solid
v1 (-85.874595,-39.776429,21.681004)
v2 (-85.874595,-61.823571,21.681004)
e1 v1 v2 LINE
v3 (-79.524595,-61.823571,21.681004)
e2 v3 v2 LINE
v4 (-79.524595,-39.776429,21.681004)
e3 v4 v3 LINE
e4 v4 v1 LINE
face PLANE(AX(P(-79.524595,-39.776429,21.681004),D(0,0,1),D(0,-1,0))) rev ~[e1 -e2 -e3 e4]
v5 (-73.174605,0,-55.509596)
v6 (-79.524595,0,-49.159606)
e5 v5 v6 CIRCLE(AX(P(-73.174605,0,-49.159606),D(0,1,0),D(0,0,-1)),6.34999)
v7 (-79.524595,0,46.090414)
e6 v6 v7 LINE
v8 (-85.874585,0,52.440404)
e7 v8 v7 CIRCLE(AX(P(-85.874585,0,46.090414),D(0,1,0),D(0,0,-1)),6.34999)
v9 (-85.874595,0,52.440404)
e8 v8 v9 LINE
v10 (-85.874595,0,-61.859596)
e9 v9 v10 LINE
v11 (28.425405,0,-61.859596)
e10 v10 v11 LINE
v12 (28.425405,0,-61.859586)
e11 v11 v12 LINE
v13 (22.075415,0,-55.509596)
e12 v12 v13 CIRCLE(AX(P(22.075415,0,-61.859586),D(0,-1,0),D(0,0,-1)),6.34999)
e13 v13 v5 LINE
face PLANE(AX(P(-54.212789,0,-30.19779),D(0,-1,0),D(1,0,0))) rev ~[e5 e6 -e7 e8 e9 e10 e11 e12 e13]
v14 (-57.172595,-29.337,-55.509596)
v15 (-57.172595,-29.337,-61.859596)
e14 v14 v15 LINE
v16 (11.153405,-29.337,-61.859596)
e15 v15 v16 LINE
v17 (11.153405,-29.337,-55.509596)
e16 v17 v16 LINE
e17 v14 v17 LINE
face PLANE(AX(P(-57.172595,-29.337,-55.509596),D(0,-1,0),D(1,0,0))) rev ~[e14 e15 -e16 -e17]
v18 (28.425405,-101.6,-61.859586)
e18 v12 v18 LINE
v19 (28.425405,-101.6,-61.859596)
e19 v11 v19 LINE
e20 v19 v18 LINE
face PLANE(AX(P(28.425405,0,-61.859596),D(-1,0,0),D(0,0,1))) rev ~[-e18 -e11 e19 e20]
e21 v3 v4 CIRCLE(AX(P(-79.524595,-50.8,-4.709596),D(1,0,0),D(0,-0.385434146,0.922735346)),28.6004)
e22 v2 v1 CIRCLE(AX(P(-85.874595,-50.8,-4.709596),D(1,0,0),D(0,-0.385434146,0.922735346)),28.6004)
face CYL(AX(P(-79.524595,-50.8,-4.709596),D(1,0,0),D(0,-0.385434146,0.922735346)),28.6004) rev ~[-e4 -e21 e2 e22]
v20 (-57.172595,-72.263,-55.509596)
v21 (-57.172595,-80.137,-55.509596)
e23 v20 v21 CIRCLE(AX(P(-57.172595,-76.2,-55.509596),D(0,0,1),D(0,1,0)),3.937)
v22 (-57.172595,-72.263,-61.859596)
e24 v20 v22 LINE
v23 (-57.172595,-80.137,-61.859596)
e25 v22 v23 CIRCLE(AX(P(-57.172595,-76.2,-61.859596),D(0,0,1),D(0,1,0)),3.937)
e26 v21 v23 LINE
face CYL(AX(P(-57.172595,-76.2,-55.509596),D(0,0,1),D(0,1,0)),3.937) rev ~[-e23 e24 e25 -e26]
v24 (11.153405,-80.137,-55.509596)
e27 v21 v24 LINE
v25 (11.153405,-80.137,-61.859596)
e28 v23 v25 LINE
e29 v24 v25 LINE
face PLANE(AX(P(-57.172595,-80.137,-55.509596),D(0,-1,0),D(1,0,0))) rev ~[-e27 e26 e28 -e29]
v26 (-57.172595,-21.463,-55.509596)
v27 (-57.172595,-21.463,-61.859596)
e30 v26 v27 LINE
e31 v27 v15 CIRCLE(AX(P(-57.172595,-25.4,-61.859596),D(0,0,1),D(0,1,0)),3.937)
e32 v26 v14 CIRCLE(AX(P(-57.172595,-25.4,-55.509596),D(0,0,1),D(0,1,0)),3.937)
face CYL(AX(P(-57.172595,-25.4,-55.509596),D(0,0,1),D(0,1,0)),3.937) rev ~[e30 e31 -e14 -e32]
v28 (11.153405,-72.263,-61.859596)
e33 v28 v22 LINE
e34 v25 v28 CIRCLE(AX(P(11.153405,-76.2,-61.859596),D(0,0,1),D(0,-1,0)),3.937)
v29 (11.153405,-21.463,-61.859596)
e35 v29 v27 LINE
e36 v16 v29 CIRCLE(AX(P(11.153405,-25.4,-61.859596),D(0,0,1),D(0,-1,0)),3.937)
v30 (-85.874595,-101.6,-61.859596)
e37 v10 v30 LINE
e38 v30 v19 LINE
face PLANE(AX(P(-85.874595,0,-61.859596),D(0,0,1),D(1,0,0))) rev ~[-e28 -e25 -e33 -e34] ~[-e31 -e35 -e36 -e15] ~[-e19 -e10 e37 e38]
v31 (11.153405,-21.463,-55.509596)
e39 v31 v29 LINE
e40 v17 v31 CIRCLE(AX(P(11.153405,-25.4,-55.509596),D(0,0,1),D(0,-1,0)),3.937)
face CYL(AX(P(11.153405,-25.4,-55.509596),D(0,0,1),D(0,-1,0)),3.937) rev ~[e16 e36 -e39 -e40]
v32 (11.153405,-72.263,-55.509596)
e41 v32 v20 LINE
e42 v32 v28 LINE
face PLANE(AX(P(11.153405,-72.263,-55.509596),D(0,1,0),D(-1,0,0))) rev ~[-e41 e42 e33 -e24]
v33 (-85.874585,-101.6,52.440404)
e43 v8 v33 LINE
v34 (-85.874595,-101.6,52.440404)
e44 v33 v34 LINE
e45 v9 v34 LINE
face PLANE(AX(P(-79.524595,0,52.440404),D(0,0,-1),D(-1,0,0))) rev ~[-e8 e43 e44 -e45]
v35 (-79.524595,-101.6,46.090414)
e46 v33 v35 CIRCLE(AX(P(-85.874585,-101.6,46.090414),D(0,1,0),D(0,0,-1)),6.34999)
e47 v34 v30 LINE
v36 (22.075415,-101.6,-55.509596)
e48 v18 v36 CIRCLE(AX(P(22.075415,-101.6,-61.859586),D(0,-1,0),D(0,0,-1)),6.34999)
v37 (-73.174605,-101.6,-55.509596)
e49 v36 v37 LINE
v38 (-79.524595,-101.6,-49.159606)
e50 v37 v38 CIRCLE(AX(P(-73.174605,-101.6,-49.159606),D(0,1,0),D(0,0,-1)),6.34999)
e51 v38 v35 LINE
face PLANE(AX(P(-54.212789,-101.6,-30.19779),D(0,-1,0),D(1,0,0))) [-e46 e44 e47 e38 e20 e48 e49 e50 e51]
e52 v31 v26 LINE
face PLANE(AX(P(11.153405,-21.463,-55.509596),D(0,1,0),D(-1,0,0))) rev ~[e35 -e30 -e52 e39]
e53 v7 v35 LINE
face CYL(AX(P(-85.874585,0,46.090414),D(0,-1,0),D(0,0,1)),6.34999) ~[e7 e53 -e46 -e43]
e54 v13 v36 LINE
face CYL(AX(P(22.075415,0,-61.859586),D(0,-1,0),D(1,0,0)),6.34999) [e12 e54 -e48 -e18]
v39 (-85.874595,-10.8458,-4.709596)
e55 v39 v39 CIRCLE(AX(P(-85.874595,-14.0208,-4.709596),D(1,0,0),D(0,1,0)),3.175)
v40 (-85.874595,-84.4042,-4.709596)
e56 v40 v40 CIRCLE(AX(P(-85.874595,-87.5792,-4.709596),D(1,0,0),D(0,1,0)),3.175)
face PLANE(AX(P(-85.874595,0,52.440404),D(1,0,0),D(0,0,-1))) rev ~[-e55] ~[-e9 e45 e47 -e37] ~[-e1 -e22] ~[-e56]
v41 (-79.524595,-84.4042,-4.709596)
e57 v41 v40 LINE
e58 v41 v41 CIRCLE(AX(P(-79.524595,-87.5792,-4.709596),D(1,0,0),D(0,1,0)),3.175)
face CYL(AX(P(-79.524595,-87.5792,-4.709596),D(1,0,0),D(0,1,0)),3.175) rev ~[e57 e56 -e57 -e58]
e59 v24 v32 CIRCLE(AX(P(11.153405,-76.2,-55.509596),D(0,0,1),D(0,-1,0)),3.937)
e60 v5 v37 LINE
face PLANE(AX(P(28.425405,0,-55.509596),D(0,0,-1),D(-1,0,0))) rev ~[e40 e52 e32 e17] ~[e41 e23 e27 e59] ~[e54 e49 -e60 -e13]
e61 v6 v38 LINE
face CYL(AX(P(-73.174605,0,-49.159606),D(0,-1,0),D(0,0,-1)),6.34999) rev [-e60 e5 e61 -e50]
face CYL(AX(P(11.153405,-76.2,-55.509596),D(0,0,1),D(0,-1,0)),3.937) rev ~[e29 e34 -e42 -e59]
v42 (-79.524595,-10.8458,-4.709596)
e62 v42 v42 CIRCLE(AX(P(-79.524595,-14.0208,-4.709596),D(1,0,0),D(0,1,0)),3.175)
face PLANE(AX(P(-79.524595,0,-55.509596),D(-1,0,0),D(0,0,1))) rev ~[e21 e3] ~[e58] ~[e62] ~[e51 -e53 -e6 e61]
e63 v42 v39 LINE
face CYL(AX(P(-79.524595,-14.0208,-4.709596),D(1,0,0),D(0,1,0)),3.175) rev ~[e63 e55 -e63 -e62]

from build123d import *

# Parameters (mm, degrees)
F1_DEPTH = 101.6
F2_R     = 6.34999
F3_R     = 3.175
F4_DEPTH = 25.4
F6_DEPTH = 25.4


# Not quite as in the source:
# - a fillet or chamfer is up to 0.001 mm smaller than in the source, because OpenCascade refuses the exact size


with BuildPart() as f1:
    # F0 (on Front) → F1 (new body)
    with BuildSketch(Plane.XZ):
        Polygon((-79.5245949868, 52.4404040542), (-85.8745949868, 52.4404040542), (-85.8745949868, -61.8595959458), (28.4254050132, -61.8595959458), (28.4254050132, -55.5095959458), (-79.5245949868, -55.5095959458), align=None)
    extrude(amount=F1_DEPTH)

    # F2 (radius 6.35 in the source; OpenCascade refuses exactly that, so slightly less here)
    f2_edges = [f1.edges().sort_by_distance(p)[0] for p in [
        (-79.524595, -50.8, 52.440404),
        (28.425405, -50.8, -55.509596),
        (-79.524595, -50.8, -55.509596),
    ]]
    fillet(f2_edges, radius=F2_R)

    # F3 (on face) → F4 (cut)
    with BuildSketch(Plane.YZ.offset(-79.5245949868)):
        with BuildLine():
            Line((-39.7764292627, 21.6810040542), (-61.8235707373, 21.6810040542))
            ThreePointArc((-61.8235707373, 21.6810040542), (-50.8, -33.3099959458), (-39.7764292627, 21.6810040542))
        make_face()
        with Locations((-87.5792, -4.7095959458)):
            Circle(F3_R)
        with Locations((-14.0208, -4.7095959458)):
            Circle(F3_R)
    extrude(amount=-F4_DEPTH, mode=Mode.SUBTRACT)

    # F5 (on face) → F6 (cut)
    with BuildSketch(Plane.XY.offset(-55.5095959458)):
        with BuildLine():
            ThreePointArc((-57.1725949868, -72.263), (-61.1095949868, -76.2), (-57.1725949868, -80.137))
            Line((-57.1725949868, -80.137), (11.1534050132, -80.137))
            ThreePointArc((11.1534050132, -80.137), (15.0904050132, -76.2), (11.1534050132, -72.263))
            Line((11.1534050132, -72.263), (-57.1725949868, -72.263))
        make_face()
        with BuildLine():
            ThreePointArc((-57.1725949868, -21.463), (-61.1095949868, -25.4), (-57.1725949868, -29.337))
            Line((-57.1725949868, -29.337), (11.1534050132, -29.337))
            ThreePointArc((11.1534050132, -29.337), (15.0904050132, -25.4), (11.1534050132, -21.463))
            Line((11.1534050132, -21.463), (-57.1725949868, -21.463))
        make_face()
    extrude(amount=-F6_DEPTH, mode=Mode.SUBTRACT)


solid = f1.part
